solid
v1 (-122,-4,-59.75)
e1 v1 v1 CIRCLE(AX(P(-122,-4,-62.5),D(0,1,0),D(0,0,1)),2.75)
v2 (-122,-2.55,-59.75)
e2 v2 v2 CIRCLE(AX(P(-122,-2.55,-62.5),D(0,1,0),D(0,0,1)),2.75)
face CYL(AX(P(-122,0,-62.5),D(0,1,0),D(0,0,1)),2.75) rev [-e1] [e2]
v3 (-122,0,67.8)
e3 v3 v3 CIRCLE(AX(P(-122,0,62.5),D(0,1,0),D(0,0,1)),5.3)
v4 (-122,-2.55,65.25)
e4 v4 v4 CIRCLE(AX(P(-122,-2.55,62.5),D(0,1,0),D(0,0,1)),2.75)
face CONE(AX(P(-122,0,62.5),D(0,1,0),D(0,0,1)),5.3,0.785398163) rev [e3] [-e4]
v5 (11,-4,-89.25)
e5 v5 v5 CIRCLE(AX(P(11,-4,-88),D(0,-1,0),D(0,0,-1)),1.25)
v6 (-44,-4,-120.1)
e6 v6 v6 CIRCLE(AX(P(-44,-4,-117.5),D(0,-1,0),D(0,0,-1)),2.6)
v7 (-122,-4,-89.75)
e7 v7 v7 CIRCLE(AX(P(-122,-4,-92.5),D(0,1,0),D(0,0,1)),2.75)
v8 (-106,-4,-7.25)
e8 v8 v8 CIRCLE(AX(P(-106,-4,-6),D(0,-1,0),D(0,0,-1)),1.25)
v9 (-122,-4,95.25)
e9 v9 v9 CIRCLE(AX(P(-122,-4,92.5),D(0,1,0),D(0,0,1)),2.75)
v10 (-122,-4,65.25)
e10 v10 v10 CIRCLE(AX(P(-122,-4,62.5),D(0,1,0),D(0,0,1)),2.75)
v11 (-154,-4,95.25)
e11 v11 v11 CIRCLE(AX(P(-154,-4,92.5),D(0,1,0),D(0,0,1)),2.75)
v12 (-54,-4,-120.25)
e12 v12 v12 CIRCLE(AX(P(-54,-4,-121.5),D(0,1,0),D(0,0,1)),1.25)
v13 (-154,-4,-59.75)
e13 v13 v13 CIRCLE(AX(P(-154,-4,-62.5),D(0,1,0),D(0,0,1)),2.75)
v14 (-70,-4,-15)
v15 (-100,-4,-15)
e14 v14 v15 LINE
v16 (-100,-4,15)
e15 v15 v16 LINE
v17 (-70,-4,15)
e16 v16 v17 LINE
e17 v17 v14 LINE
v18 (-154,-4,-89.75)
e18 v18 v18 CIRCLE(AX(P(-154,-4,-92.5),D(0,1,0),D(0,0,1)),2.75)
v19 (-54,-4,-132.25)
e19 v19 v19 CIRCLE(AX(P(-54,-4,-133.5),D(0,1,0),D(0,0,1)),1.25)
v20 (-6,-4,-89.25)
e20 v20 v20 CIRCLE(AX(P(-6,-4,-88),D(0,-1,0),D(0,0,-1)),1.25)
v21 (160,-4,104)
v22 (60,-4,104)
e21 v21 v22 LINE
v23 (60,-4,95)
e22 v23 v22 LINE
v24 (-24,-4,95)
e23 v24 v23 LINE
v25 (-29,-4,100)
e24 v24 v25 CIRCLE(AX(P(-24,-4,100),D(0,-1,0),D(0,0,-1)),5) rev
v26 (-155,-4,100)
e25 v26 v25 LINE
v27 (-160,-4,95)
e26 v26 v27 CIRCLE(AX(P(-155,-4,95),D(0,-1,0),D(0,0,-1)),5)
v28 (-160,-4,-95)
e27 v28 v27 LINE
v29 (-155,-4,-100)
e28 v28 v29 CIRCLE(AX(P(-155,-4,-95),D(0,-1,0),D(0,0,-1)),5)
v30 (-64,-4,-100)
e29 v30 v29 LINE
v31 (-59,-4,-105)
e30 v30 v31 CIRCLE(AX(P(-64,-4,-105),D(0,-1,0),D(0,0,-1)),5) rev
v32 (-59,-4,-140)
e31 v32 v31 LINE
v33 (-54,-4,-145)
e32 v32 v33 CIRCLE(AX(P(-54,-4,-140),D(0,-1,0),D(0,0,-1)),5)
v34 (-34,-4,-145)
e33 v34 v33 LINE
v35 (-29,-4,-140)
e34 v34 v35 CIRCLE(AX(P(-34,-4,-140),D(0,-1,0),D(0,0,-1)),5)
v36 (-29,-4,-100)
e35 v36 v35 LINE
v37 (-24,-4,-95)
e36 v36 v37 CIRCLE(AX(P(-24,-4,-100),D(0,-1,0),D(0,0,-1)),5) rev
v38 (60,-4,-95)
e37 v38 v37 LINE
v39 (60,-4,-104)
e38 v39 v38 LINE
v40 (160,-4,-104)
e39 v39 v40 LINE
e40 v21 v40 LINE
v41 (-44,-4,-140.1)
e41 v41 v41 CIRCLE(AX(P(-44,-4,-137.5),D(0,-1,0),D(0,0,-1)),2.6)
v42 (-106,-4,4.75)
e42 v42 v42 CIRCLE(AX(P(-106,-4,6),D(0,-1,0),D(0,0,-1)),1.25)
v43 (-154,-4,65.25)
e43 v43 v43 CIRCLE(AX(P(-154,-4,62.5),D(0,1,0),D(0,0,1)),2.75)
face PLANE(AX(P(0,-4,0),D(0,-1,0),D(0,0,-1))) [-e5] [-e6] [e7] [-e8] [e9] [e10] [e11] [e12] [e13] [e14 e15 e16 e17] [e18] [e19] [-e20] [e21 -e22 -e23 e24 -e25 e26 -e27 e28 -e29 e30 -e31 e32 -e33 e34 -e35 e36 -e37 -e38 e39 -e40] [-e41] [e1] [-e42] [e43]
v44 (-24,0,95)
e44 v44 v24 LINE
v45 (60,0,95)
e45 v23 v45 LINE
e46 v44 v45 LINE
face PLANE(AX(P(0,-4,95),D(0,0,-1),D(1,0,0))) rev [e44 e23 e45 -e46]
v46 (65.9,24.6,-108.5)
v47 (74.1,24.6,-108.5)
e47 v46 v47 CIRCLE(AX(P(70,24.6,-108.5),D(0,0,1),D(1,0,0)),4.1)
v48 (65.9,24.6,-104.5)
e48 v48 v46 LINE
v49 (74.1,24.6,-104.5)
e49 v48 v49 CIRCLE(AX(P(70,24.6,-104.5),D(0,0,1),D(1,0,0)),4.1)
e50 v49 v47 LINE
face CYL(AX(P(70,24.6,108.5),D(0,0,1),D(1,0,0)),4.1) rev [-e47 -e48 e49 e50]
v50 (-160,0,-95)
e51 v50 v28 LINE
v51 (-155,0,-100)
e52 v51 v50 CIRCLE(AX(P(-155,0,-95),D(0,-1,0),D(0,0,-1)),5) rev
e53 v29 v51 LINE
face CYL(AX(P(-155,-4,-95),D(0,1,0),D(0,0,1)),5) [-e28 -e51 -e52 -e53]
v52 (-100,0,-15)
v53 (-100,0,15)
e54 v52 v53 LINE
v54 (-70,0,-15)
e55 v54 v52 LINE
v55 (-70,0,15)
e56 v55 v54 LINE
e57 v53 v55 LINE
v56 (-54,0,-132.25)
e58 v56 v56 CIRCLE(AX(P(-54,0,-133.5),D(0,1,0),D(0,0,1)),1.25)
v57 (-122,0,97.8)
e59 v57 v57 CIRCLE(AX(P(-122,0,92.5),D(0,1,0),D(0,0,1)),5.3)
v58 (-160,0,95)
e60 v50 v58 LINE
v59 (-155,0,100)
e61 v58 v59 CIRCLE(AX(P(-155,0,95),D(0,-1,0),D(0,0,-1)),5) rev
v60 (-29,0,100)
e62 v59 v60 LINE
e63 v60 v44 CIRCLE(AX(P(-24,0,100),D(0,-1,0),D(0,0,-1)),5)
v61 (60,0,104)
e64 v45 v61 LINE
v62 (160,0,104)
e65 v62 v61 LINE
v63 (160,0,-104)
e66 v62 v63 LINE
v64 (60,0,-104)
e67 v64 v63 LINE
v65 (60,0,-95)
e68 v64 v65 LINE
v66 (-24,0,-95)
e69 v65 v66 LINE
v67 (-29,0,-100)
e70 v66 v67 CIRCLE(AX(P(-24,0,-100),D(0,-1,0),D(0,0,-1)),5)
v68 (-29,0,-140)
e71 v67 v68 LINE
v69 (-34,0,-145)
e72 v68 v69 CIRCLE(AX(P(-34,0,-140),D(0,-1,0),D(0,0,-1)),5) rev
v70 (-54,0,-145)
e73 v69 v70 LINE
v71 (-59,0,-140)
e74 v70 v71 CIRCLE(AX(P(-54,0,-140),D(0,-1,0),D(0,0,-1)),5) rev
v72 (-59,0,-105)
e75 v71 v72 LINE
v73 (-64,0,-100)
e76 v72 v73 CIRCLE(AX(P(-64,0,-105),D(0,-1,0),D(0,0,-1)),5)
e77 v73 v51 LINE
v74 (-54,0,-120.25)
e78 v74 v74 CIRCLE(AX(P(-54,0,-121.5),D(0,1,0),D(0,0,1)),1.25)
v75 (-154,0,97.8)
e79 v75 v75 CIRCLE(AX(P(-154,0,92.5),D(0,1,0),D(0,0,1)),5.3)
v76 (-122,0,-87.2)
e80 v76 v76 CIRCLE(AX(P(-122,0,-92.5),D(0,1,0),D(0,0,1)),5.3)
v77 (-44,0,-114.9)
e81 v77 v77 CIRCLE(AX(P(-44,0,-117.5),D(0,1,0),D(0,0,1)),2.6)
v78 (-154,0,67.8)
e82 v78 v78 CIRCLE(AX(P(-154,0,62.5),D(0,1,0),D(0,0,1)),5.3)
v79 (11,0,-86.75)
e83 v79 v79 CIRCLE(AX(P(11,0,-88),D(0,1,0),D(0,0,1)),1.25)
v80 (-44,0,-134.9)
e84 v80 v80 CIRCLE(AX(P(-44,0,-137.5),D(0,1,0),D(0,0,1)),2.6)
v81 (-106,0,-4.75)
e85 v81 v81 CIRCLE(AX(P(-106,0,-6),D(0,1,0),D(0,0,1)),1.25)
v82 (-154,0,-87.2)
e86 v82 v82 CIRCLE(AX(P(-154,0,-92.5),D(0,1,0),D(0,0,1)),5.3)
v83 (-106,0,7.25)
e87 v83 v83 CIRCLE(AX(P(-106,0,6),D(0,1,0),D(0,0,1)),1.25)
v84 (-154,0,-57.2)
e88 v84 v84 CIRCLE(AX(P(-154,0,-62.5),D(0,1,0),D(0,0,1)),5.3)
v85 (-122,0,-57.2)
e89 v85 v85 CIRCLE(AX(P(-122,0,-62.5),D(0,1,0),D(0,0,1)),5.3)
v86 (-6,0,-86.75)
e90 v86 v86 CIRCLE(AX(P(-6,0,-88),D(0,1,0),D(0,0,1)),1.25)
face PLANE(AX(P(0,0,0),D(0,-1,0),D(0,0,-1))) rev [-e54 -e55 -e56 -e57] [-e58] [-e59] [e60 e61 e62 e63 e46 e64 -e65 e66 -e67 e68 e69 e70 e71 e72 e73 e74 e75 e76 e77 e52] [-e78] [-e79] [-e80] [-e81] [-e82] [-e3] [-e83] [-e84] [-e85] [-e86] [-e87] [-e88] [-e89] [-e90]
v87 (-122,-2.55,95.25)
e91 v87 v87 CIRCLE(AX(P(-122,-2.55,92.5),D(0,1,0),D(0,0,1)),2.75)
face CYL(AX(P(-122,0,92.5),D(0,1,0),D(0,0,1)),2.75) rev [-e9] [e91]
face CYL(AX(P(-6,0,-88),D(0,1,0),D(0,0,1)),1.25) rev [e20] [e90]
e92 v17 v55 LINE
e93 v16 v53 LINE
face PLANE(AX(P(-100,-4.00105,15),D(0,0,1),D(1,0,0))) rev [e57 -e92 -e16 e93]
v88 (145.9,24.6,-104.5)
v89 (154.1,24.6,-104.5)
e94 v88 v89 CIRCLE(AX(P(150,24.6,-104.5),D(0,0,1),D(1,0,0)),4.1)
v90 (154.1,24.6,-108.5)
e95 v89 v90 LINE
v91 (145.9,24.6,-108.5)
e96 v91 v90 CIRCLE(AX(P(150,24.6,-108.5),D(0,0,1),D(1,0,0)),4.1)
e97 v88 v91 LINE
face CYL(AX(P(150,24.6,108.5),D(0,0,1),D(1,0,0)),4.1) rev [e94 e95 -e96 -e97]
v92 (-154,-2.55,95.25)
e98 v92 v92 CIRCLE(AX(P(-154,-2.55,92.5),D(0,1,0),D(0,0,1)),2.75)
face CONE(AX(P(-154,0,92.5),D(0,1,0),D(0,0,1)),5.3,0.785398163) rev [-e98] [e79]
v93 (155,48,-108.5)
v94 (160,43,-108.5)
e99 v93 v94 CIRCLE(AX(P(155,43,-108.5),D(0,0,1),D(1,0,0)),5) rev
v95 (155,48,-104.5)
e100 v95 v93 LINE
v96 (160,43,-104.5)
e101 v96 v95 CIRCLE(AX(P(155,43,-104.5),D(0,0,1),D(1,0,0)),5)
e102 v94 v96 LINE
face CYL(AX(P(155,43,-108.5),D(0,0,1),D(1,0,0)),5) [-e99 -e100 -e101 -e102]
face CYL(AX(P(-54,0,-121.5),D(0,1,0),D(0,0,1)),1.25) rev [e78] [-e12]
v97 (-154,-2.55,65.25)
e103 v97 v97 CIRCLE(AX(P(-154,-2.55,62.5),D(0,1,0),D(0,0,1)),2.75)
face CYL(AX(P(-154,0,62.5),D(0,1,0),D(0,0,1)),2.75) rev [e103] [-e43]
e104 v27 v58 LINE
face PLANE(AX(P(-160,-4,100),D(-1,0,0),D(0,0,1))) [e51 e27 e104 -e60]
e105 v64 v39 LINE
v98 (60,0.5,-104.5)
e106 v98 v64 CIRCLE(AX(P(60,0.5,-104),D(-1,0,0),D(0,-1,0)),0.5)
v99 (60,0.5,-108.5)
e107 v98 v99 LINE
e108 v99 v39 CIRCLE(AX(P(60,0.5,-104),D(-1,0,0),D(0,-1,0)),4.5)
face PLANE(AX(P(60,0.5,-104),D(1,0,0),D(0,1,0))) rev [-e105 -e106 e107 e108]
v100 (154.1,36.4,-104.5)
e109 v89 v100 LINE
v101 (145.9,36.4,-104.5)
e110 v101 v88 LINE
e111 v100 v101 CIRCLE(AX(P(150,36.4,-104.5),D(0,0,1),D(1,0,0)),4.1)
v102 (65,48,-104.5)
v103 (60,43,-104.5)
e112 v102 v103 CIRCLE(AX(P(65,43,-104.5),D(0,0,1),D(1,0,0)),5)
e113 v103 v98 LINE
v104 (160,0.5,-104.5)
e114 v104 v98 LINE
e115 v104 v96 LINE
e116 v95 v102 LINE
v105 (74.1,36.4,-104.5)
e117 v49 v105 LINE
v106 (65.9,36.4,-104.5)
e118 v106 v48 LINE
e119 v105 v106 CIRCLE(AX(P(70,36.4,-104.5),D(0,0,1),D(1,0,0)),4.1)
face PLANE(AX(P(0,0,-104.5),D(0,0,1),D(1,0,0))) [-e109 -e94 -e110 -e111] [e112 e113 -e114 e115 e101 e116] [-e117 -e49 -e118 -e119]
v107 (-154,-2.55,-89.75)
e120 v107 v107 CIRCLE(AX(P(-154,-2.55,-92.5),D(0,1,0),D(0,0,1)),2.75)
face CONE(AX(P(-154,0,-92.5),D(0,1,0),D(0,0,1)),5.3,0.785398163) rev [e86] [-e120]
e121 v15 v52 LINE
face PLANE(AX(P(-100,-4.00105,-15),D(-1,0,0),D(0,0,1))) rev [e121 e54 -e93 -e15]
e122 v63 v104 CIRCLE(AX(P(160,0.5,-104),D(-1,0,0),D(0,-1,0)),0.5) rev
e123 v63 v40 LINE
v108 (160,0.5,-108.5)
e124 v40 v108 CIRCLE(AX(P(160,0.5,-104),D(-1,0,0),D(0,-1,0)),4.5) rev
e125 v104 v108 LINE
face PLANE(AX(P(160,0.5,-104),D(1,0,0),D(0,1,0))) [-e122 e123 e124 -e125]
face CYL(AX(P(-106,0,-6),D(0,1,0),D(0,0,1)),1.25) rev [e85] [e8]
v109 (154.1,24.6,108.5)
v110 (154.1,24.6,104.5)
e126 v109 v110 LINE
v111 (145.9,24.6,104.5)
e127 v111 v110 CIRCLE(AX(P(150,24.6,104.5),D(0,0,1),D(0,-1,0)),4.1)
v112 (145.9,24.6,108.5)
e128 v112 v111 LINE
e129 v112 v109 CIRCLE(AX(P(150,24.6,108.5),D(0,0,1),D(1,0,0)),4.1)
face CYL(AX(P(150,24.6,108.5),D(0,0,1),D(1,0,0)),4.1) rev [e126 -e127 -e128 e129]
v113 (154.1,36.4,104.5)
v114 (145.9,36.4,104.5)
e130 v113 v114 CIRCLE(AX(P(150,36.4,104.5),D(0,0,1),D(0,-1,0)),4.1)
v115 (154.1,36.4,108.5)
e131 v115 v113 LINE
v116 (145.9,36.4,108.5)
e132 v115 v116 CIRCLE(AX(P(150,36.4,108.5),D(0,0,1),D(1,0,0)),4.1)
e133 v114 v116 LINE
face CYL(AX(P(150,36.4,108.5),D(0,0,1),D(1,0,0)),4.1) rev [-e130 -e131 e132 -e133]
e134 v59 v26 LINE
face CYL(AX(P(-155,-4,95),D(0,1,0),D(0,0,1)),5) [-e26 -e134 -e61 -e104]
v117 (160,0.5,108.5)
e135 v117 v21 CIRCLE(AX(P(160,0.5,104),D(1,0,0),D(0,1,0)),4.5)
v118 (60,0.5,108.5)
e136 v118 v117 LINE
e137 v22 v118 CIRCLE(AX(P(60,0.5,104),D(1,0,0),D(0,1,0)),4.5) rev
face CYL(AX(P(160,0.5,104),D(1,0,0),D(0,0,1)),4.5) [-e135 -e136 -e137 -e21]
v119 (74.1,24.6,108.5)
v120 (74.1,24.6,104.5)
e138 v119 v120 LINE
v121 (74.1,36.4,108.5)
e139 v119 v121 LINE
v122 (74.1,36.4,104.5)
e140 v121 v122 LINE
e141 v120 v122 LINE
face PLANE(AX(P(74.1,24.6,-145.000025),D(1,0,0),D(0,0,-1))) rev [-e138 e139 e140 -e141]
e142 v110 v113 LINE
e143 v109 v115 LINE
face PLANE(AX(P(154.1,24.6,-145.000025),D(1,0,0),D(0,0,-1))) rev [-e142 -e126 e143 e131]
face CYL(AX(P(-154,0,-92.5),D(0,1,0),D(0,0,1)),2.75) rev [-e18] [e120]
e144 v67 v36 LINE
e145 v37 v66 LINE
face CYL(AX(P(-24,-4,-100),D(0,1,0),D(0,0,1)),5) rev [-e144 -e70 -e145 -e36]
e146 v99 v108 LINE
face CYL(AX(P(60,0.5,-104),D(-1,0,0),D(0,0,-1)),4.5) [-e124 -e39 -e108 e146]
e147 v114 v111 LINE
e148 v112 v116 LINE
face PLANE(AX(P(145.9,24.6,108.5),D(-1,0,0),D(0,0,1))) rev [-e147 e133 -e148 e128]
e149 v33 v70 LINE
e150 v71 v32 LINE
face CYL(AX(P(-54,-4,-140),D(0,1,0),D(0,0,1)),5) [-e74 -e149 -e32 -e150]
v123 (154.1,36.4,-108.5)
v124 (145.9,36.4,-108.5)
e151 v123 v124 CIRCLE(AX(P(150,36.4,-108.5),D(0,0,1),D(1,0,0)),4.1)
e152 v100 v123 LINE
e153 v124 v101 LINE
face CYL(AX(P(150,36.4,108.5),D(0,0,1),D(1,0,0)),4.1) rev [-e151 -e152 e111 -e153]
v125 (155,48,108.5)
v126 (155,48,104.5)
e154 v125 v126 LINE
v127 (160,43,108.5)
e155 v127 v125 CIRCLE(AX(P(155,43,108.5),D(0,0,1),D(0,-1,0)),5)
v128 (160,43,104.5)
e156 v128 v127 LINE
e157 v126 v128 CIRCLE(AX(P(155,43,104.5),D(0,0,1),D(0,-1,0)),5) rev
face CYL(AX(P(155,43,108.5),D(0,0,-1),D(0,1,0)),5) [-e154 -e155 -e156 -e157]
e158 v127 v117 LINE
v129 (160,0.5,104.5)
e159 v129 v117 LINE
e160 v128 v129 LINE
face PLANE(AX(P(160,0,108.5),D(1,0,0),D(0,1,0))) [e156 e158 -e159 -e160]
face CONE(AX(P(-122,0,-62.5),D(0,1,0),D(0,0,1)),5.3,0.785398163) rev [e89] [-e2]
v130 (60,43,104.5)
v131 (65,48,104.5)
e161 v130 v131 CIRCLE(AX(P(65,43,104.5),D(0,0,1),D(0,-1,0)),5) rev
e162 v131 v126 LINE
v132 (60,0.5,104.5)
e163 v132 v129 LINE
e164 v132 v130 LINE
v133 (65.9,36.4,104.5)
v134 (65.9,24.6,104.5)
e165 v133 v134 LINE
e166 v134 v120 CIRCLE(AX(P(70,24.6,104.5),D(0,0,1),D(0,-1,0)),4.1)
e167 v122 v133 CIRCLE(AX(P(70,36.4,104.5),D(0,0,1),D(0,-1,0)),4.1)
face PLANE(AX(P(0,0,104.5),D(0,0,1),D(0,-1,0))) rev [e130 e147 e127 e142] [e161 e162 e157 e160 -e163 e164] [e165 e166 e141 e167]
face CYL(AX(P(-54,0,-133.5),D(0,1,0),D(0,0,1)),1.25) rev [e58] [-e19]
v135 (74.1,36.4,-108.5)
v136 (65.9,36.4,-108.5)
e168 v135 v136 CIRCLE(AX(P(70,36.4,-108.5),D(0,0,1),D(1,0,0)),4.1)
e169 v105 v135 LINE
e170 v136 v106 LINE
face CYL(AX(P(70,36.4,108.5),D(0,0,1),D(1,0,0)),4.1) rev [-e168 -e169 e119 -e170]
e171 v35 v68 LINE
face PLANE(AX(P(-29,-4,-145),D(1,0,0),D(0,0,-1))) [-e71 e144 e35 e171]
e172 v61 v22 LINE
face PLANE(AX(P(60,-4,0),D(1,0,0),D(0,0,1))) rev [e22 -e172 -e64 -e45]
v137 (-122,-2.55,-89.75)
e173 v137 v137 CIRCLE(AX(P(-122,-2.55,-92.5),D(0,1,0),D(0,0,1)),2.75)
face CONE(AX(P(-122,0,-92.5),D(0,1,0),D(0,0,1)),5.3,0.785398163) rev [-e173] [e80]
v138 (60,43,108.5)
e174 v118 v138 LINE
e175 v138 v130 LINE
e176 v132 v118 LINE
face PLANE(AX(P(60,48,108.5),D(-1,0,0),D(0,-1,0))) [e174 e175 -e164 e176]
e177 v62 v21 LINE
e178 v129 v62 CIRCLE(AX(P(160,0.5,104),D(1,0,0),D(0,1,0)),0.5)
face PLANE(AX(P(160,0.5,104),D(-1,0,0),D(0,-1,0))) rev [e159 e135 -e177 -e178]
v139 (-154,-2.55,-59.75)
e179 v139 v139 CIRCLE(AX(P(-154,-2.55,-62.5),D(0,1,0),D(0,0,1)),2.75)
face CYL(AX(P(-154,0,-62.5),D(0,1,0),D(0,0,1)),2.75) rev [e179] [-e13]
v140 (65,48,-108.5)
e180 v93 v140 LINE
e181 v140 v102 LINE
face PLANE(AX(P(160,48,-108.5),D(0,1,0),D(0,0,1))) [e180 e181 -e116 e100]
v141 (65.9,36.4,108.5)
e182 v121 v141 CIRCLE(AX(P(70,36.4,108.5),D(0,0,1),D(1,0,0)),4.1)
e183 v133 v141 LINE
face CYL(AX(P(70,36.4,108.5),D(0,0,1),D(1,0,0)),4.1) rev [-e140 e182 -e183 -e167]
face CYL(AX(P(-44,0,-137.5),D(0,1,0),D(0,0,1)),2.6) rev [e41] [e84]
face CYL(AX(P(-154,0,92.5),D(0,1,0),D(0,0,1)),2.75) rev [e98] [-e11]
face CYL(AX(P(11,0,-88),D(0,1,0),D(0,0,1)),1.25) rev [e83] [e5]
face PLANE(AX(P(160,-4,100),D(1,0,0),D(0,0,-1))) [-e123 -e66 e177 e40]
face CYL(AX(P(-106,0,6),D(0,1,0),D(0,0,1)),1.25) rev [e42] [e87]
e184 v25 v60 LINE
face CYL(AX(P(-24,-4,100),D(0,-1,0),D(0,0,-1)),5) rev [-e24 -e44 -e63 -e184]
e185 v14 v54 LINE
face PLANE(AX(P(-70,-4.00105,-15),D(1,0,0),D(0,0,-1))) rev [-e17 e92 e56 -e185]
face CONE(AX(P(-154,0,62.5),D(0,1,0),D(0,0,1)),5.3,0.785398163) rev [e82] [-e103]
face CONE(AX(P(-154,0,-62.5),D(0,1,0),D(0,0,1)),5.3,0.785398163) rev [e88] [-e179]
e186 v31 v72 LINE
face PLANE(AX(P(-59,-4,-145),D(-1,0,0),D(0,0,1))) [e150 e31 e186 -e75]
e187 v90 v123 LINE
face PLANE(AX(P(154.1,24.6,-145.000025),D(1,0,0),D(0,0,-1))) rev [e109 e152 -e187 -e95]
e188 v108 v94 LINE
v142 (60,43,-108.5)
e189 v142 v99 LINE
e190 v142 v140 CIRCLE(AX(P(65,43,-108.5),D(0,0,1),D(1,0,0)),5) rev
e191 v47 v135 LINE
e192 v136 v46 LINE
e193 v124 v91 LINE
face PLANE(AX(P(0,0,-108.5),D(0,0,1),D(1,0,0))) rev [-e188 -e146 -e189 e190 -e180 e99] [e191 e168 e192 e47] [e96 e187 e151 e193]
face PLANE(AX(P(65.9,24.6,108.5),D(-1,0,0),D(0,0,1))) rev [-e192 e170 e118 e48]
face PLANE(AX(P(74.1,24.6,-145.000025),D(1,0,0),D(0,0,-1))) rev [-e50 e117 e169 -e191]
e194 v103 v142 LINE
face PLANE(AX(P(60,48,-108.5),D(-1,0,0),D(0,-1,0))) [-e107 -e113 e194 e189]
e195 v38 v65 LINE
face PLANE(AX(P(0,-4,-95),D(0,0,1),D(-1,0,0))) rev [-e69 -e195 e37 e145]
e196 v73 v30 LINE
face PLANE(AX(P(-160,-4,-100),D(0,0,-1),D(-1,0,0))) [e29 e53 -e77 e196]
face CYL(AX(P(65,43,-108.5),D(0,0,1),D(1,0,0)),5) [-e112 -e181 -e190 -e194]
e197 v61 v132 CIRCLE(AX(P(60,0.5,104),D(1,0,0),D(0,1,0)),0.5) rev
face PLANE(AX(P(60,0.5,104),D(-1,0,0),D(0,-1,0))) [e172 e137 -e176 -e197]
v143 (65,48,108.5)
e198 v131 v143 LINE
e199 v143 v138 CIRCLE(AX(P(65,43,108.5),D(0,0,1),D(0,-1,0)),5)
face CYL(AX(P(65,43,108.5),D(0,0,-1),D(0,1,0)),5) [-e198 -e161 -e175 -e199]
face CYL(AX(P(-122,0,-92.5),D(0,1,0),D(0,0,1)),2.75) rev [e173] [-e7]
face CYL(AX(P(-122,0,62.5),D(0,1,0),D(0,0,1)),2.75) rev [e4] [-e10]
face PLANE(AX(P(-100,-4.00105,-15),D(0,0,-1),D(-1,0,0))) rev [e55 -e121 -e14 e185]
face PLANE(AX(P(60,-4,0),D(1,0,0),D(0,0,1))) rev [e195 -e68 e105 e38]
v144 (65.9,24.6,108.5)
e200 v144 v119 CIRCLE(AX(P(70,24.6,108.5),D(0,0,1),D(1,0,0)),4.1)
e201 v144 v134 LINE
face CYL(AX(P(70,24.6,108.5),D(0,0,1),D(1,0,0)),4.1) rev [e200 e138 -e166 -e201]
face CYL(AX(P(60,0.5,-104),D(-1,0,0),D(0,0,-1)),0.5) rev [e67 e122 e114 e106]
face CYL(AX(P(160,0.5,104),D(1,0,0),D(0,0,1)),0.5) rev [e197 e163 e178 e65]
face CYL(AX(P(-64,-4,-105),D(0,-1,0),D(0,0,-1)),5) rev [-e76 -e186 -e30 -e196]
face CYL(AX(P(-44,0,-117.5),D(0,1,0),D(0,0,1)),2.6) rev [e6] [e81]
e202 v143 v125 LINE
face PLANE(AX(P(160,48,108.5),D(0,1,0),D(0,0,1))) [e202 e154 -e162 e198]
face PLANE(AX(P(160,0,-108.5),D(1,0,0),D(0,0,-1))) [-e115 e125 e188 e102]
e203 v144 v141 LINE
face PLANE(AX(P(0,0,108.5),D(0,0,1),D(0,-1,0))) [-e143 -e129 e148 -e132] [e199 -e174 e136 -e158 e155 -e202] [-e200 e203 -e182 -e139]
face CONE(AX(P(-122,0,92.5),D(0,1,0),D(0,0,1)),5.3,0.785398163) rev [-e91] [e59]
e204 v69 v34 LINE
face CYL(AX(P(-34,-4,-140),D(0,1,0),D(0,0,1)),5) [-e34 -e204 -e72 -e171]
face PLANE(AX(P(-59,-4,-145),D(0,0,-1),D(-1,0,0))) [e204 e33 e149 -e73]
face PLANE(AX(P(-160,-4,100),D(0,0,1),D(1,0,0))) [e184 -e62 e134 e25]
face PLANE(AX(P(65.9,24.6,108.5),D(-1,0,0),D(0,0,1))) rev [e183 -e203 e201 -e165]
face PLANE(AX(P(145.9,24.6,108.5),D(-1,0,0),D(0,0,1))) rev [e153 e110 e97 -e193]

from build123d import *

# Parameters (mm, degrees)
SKETCH_1_W                  = 320
SKETCH_1_H                  = 200
SM_BASE_FLANGE_1_DEPTH      = 4
HOLE_WIZARD_1_AT_2_COUNT    = 2
HOLE_WIZARD_1_AT_2_PITCH    = 30
HOLE_WIZARD_1_AT_3_COUNT    = 2
HOLE_WIZARD_1_AT_3_PITCH    = 43.863424399
HOLE_WIZARD_1_AT_4_COUNT    = 2
HOLE_WIZARD_1_AT_4_PITCH    = 32
HOLE_WIZARD_1_AT_5_COUNT    = 2
HOLE_WIZARD_1_AT_5_PITCH    = 129.031004026
HOLE_WIZARD_1_AT_6_COUNT    = 2
HOLE_WIZARD_1_AT_6_PITCH    = 125
HOLE_WIZARD_1_AT_7_COUNT    = 2
HOLE_WIZARD_1_AT_7_PITCH    = 158.268758762
HOLE_WIZARD_1_AT_8_COUNT    = 2
HOLE_WIZARD_1_AT_8_PITCH    = 155
SKETCH_9_W                  = 30
SKETCH_9_H                  = 45
SM_BASE_FLANGE_1_2_DEPTH    = 4
SKETCH_27_W                 = 89
SKETCH_27_H                 = 5
CUT_EXTRUDE_2_DEPTH         = 216.965274987
SM_EDGE_FLANGE_1_DEPTH      = 100
SM_EDGE_FLANGE_1_BEND_DEPTH = 100
HOLE_START                  = -108.5
HOLE_WIZARD_8_2_8_2_1_DEPTH = 217
F_5_2_5_2_DIAMETER_HOLE1_D  = 5.2
CUT_EXTRUDE_1_REACH         = 223.199
SKETCH_21_W                 = 30
SKETCH_21_H                 = 30
HOLE_WIZARD_M3_2_D          = 2.5
OTHER_START                 = -108.5
OTHER_1_DEPTH               = 217
OTHER_START_2               = -4
OTHER_2_DEPTH               = 4
OTHER_2_2_DEPTH             = 4
HOLE_WIZARD_M3_1_D          = 2.5
HOLE_WIZARD_M3_3_D          = 2.5


# Read off the part's stored shape, not the designer's step: Ø8.2 (8.2) 直径槽口1, 断开-边角1, 断开-边角2
# Sheet-metal steps are written as plain solids
with BuildPart() as part:
    # Sketch 1 → Sm Base Flange 1 (new body)
    with BuildSketch(Plane(origin=(0, 0, 0), x_dir=(1, 0, 0), z_dir=(0, 1, 0))):
        Rectangle(SKETCH_1_W, SKETCH_1_H)
    extrude(amount=-SM_BASE_FLANGE_1_DEPTH)

    # 草图7 → 打孔尺寸开槽半沉头螺钉的类型1 (revolve, cut)
    with BuildSketch(Plane(origin=(-154, 0, 62.5), x_dir=(0, 0, 1), z_dir=(1, 0, 0))):
        Polygon((0, 0), (0, 4), (2.75, 4), (2.75, 2.55), (5.3, 0), align=None)
    hole_wizard_1 = revolve(axis=Axis((-154, 6.35, 62.5), (0, -1, 0)), mode=Mode.SUBTRACT)

    # 打孔尺寸开槽半沉头螺钉的类型1 at 2: 打孔尺寸开槽半沉头螺钉的类型1 ×2
    with Locations(*[(0, 0, i * HOLE_WIZARD_1_AT_2_PITCH) for i in range(1, HOLE_WIZARD_1_AT_2_COUNT)]):
        add(hole_wizard_1, mode=Mode.SUBTRACT)

    # 打孔尺寸开槽半沉头螺钉的类型1 at 3: 打孔尺寸开槽半沉头螺钉的类型1 ×2
    with Locations(*[Vector(0.7295372041400852, 0, 0.6839411288813297) * (i * HOLE_WIZARD_1_AT_3_PITCH) for i in range(1, HOLE_WIZARD_1_AT_3_COUNT)]):
        add(hole_wizard_1, mode=Mode.SUBTRACT)

    # 打孔尺寸开槽半沉头螺钉的类型1 at 4: 打孔尺寸开槽半沉头螺钉的类型1 ×2
    with Locations(*[(i * HOLE_WIZARD_1_AT_4_PITCH, 0, 0) for i in range(1, HOLE_WIZARD_1_AT_4_COUNT)]):
        add(hole_wizard_1, mode=Mode.SUBTRACT)

    # 打孔尺寸开槽半沉头螺钉的类型1 at 5: 打孔尺寸开槽半沉头螺钉的类型1 ×2
    with Locations(*[Vector(0.24800241028513723, 0, -0.9687594151763185) * (i * HOLE_WIZARD_1_AT_5_PITCH) for i in range(1, HOLE_WIZARD_1_AT_5_COUNT)]):
        add(hole_wizard_1, mode=Mode.SUBTRACT)

    # 打孔尺寸开槽半沉头螺钉的类型1 at 6: 打孔尺寸开槽半沉头螺钉的类型1 ×2
    with Locations(*[(0, 0, -i * HOLE_WIZARD_1_AT_6_PITCH) for i in range(1, HOLE_WIZARD_1_AT_6_COUNT)]):
        add(hole_wizard_1, mode=Mode.SUBTRACT)

    # 打孔尺寸开槽半沉头螺钉的类型1 at 7: 打孔尺寸开槽半沉头螺钉的类型1 ×2
    with Locations(*[Vector(0.20218772327747656, 0, -0.979346784625278) * (i * HOLE_WIZARD_1_AT_7_PITCH) for i in range(1, HOLE_WIZARD_1_AT_7_COUNT)]):
        add(hole_wizard_1, mode=Mode.SUBTRACT)

    # 打孔尺寸开槽半沉头螺钉的类型1 at 8: 打孔尺寸开槽半沉头螺钉的类型1 ×2
    with Locations(*[(0, 0, -i * HOLE_WIZARD_1_AT_8_PITCH) for i in range(1, HOLE_WIZARD_1_AT_8_COUNT)]):
        add(hole_wizard_1, mode=Mode.SUBTRACT)

    # 草图9 → Sm Base Flange 1 2 (add)
    with BuildSketch(Plane(origin=(0, 0, 0), x_dir=(1, 0, 0), z_dir=(0, 1, 0))):
        with Locations((-44, 122.5)):
            Rectangle(SKETCH_9_W, SKETCH_9_H)
    extrude(amount=-SM_BASE_FLANGE_1_2_DEPTH)

    # 草图27 → 切除-拉伸2 (cut, through all)
    with BuildSketch(Plane(origin=(0, 0, 0), x_dir=(1, 0, 0), z_dir=(0, 1, 0))):
        with Locations((15.5, 97.5)):
            Rectangle(SKETCH_27_W, SKETCH_27_H)
        with Locations((15.5, -97.5)):
            Rectangle(SKETCH_27_W, SKETCH_27_H)
    extrude(amount=-CUT_EXTRUDE_2_DEPTH, mode=Mode.SUBTRACT)

    # 边线-法兰1 section (across the edge) → 边线-法兰1 (add)
    with BuildSketch(Plane(origin=(60, 0, 104.5), x_dir=(0, 0, -1), z_dir=(1, 0, 0))):
        with BuildLine():
            Line((-4, 0.5), (-4, 48))
            Line((-4, 48), (0, 48))
            Line((0, 48), (0, 0.5))
            ThreePointArc((0, 0.5), (0.146446609, 0.146446609), (0.5, 0))
            Line((0.5, 0), (4.5, 0))
            Line((4.5, 0), (4.5, -4))
            Line((4.5, -4), (0.5, -4))
            ThreePointArc((0.5, -4), (-2.681980515, -2.681980515), (-4, 0.5))
        make_face()
    extrude(amount=SM_EDGE_FLANGE_1_DEPTH)

    # 边线-法兰1 section 2 (across the edge) → 边线-法兰1 bend (add)
    with BuildSketch(Plane(origin=(160, 0, -104.5), x_dir=(0, 0, 1), z_dir=(-1, 0, 0))):
        with BuildLine():
            Line((-4, 0.5), (-4, 48))
            Line((-4, 48), (0, 48))
            Line((0, 48), (0, 0.5))
            ThreePointArc((0, 0.5), (0.146446609, 0.146446609), (0.5, 0))
            Line((0.5, 0), (4.5, 0))
            Line((4.5, 0), (4.5, -4))
            Line((4.5, -4), (0.5, -4))
            ThreePointArc((0.5, -4), (-2.681980515, -2.681980515), (-4, 0.5))
        make_face()
    extrude(amount=SM_EDGE_FLANGE_1_BEND_DEPTH)

    # Ø8.2 (8.2) 直径槽口1 outline → Ø8.2 (8.2) 直径槽口1 (cut)
    with BuildSketch(Plane.XY.offset(HOLE_START)):
        with BuildLine():
            ThreePointArc((145.9, 24.6), (150, 20.5), (154.1, 24.6))
            Line((154.1, 24.6), (154.1, 36.4))
            ThreePointArc((154.1, 36.4), (150, 40.5), (145.9, 36.4))
            Line((145.9, 36.4), (145.9, 24.6))
        make_face()
        with BuildLine():
            ThreePointArc((65.9, 24.6), (70, 20.5), (74.1, 24.6))
            Line((74.1, 24.6), (74.1, 36.4))
            ThreePointArc((74.1, 36.4), (70, 40.5), (65.9, 36.4))
            Line((65.9, 36.4), (65.9, 24.6))
        make_face()
    extrude(amount=HOLE_WIZARD_8_2_8_2_1_DEPTH, mode=Mode.SUBTRACT)

    # Ø5.2 (5.2) Diameter Hole1 (through all)
    with Locations(Plane(origin=(0, 0, 0), x_dir=(1, 0, 0), z_dir=(0, 1, 0))):
        with Locations((-44, 117.5), (-44, 137.5)):
            Hole(F_5_2_5_2_DIAMETER_HOLE1_D / 2)

    # 草图21 → 切除-拉伸1 (cut, up to next)
    with BuildSketch(Plane(origin=(0, 0, 0), x_dir=(1, 0, 0), z_dir=(0, 1, 0)), mode=Mode.PRIVATE) as cut_extrude_1_sk1:
        with Locations((-85, 0)):
            Rectangle(SKETCH_21_W, SKETCH_21_H)
    cut_extrude_1_tool1 = extrude(cut_extrude_1_sk1.sketch, amount=-CUT_EXTRUDE_1_REACH, mode=Mode.PRIVATE) & part.part
    add(cut_extrude_1_tool1.solids().sort_by_distance((-85, 0, 0))[0], mode=Mode.SUBTRACT)

    # M3 螺纹孔2 (through all)
    with Locations(Plane(origin=(0, 0, 0), x_dir=(1, 0, 0), z_dir=(0, 1, 0))):
        with Locations((-106, 6), (-106, -6)):
            Hole(HOLE_WIZARD_M3_2_D / 2)

    # Other 1 outline → Other 1 (cut)
    with BuildSketch(Plane.XY.offset(OTHER_START)):
        with BuildLine():
            ThreePointArc((60, 43), (61.464466094, 46.535533906), (65, 48))
            Line((65, 48), (60, 48))
            Line((60, 48), (60, 43))
        make_face()
        with BuildLine():
            ThreePointArc((155, 48), (158.535533906, 46.535533906), (160, 43))
            Line((160, 43), (160, 48))
            Line((160, 48), (155, 48))
        make_face()
    extrude(amount=OTHER_1_DEPTH, mode=Mode.SUBTRACT)

    # Other 2 outline → Other 2 (cut)
    with BuildSketch(Plane(origin=(0, 0, 0), x_dir=(1, 0, 0), z_dir=(0, 1, 0)).offset(OTHER_START_2)):
        with BuildLine():
            Line((-29, 145), (-34, 145))
            ThreePointArc((-34, 145), (-30.464466094, 143.535533906), (-29, 140))
            Line((-29, 140), (-29, 145))
        make_face()
        with BuildLine():
            Line((-59, 145), (-59, 140))
            ThreePointArc((-59, 140), (-57.535533906, 143.535533906), (-54, 145))
            Line((-54, 145), (-59, 145))
        make_face()
        with BuildLine():
            Line((-160, 100), (-160, 95))
            ThreePointArc((-160, 95), (-158.535533906, 98.535533906), (-155, 100))
            Line((-155, 100), (-160, 100))
        make_face()
        with BuildLine():
            Line((-160, -100), (-155, -100))
            ThreePointArc((-155, -100), (-158.535533906, -98.535533906), (-160, -95))
            Line((-160, -95), (-160, -100))
        make_face()
    extrude(amount=OTHER_2_DEPTH, mode=Mode.SUBTRACT)

    # Other 2 2 outline → Other 2 2 (add)
    with BuildSketch(Plane(origin=(0, 0, 0), x_dir=(1, 0, 0), z_dir=(0, 1, 0)).offset(OTHER_START_2)):
        with BuildLine():
            Line((-29, -95), (-29, -100))
            ThreePointArc((-29, -100), (-27.535533906, -96.464466094), (-24, -95))
            Line((-24, -95), (-29, -95))
        make_face()
        with BuildLine():
            ThreePointArc((-24, 95), (-27.535533906, 96.464466094), (-29, 100))
            Line((-29, 100), (-29, 95))
            Line((-29, 95), (-24, 95))
        make_face()
        with BuildLine():
            ThreePointArc((-59, 105), (-60.464466094, 101.464466094), (-64, 100))
            Line((-64, 100), (-59, 100))
            Line((-59, 100), (-59, 105))
        make_face()
    extrude(amount=OTHER_2_2_DEPTH)

    # M3 螺纹孔1 (through all)
    with Locations(Plane(origin=(0, 0, 0), x_dir=(1, 0, 0), z_dir=(0, 1, 0))):
        with Locations((11, 88), (-6, 88)):
            Hole(HOLE_WIZARD_M3_1_D / 2)

    # M3 螺纹孔3 (through all)
    with Locations(Plane(origin=(0, 0, 0), x_dir=(1, 0, 0), z_dir=(0, 1, 0))):
        with Locations((-54, 133.5), (-54, 121.5)):
            Hole(HOLE_WIZARD_M3_3_D / 2)


solid = part.part
